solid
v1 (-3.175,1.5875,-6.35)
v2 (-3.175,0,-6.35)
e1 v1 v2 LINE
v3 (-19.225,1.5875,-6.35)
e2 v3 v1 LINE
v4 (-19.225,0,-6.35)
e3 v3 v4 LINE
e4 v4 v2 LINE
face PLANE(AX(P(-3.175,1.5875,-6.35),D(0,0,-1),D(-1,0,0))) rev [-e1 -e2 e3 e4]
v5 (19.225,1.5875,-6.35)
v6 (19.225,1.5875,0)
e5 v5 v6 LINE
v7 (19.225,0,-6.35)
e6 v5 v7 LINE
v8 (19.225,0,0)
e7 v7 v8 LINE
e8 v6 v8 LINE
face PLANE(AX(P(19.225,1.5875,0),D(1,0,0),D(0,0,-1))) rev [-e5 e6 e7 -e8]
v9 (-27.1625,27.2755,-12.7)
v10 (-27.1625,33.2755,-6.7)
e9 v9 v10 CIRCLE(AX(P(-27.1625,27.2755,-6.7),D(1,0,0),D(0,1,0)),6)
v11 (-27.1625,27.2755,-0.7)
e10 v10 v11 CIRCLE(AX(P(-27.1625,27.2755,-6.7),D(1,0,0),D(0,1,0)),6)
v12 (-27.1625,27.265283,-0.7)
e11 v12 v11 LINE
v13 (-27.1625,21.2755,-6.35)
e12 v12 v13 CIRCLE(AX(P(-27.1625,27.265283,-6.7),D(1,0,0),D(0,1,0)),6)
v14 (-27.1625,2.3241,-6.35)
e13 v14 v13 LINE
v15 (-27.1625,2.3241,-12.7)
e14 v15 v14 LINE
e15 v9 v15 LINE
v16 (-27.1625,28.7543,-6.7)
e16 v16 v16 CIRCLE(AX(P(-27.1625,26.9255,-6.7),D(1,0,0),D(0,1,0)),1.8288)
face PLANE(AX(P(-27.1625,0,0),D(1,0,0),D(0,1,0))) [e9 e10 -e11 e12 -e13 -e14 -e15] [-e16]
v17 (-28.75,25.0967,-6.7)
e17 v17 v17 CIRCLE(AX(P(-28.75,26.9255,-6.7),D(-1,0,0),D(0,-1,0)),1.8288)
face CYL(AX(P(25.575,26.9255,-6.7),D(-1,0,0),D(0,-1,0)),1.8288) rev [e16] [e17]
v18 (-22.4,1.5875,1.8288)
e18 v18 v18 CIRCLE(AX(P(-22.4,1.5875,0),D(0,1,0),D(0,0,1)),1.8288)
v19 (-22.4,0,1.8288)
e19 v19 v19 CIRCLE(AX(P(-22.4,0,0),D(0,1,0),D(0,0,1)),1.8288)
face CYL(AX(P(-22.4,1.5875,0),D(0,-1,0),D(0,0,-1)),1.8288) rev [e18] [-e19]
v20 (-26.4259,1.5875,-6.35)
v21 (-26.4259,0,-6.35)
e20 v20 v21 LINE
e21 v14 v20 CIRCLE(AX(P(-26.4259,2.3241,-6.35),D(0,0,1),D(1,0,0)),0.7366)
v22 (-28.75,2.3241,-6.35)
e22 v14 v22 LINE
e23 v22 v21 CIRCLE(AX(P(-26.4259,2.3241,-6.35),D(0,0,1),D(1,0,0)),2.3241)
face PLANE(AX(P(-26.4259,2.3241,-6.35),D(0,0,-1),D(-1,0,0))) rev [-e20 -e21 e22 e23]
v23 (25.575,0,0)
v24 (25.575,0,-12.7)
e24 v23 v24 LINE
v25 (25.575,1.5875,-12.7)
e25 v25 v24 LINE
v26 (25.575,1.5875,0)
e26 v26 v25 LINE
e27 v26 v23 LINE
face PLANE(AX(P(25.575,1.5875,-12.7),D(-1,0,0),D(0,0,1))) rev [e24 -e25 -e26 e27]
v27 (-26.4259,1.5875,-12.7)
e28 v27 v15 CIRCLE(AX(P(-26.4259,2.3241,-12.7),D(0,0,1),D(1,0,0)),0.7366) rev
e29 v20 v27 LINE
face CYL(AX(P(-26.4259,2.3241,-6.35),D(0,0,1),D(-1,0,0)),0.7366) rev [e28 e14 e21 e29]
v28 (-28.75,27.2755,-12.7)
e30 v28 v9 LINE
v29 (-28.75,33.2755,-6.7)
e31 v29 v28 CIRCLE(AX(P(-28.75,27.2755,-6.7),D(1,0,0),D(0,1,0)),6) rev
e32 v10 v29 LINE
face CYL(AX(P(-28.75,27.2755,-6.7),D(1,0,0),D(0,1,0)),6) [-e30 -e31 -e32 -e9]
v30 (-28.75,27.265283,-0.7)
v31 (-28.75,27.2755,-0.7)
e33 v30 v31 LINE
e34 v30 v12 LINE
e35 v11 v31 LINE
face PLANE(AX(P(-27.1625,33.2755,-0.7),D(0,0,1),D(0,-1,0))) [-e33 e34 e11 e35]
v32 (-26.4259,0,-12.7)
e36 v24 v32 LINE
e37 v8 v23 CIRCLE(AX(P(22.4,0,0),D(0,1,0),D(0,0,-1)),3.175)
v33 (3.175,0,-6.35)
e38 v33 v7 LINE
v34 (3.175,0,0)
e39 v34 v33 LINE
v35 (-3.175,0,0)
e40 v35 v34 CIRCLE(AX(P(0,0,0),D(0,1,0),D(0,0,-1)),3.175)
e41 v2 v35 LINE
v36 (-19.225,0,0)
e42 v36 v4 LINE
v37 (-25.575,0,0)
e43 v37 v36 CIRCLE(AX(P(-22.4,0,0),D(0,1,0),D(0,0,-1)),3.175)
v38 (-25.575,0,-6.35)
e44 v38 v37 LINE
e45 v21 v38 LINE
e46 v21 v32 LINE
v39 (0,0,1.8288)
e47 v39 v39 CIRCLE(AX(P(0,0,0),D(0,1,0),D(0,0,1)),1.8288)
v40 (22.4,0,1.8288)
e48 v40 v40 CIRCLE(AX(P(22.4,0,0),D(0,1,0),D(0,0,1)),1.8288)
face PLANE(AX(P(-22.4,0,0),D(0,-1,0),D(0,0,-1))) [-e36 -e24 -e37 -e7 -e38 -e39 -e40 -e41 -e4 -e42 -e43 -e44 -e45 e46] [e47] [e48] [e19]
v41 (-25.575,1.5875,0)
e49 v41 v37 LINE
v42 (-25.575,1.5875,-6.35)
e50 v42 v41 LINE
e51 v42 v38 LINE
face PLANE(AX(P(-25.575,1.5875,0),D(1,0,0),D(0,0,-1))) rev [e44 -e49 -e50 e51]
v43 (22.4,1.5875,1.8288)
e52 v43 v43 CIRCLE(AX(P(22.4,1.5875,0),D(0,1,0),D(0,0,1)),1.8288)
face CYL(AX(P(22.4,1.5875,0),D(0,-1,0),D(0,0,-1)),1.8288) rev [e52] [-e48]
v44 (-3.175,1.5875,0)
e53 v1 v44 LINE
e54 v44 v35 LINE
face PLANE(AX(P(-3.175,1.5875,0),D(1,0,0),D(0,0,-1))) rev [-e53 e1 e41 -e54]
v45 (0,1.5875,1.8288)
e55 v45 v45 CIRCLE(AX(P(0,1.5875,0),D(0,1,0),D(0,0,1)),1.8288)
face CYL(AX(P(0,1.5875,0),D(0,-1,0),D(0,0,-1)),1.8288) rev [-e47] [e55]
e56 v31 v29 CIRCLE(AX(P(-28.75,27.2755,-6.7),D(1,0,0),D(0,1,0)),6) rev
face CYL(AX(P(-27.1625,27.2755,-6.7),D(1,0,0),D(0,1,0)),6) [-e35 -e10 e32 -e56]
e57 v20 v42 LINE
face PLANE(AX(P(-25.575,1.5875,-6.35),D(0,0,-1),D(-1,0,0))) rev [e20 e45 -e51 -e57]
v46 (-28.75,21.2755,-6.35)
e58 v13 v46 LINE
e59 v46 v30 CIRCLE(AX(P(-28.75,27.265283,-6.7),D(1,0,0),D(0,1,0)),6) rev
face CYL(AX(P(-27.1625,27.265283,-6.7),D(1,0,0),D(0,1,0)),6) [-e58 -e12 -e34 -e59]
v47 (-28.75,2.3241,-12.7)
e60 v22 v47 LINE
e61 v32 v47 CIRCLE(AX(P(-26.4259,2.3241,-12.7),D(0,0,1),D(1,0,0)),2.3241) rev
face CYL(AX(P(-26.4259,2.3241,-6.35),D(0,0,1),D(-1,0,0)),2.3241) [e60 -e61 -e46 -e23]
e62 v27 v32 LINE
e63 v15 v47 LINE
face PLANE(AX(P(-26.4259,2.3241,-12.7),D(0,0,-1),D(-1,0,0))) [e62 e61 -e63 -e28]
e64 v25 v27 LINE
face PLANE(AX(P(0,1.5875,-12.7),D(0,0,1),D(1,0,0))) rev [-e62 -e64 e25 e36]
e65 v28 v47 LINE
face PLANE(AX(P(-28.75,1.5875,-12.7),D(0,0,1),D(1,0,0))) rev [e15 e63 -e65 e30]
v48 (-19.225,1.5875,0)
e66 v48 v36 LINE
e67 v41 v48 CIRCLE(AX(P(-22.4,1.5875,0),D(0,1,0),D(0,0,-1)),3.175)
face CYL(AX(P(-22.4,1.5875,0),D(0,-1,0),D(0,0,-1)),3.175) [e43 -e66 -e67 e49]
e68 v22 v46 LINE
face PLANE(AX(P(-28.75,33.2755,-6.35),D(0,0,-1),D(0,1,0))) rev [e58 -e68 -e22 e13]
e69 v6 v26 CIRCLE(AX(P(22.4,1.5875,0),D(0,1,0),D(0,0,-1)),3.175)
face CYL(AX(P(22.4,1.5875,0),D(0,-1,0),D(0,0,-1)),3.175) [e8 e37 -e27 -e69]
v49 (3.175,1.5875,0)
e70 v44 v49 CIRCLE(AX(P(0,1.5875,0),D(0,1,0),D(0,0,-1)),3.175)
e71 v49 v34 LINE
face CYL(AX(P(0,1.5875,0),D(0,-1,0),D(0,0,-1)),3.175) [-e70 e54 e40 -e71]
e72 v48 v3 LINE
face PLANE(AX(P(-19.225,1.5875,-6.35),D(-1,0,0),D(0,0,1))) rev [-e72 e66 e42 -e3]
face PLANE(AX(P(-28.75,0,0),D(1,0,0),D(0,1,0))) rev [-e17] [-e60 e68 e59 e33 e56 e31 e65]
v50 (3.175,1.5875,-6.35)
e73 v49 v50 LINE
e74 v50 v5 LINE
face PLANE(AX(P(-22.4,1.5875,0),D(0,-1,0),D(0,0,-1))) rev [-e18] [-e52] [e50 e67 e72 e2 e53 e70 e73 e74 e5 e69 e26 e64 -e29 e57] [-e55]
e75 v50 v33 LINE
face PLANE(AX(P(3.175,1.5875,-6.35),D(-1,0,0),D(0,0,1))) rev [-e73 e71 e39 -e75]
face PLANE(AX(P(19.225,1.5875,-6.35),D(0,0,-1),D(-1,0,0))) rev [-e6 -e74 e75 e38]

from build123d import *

# Parameters (mm, degrees)
SKETCH1_R                    = 1.8288
BASE_FLANGE1_DEPTH           = 1.5875
EDGE_FLANGE2_STRIP_W         = 7.8232
EDGE_FLANGE2_STRIP_H         = 1.5875
EDGE_FLANGE2_STRIP_CUT_DEPTH = 6.35
EDGE_FLANGE2_DEPTH           = 6.35
SKETCH19_W                   = 5.65
SKETCH19_H                   = 12
TAB1_DEPTH                   = 1.5875
HOLE1_START                  = -28.75
HOLE1_OUTLINE_R              = 1.8288
HOLE1_DEPTH                  = 1.5875
FILLET1_R                    = 6


# Read off the part's stored shape, not the designer's step: Hole1
# Sheet-metal steps are written as plain solids
with BuildPart() as part:
    # Sketch1 → Base-Flange1 (new body)
    with BuildSketch(Plane(origin=(0, 0, 0), x_dir=(1, 0, 0), z_dir=(0, 1, 0))):
        with BuildLine():
            Line((-25.575, 0), (-25.575, 6.35))
            Line((-25.575, 6.35), (-27.1625, 6.35))
            Line((-27.1625, 6.35), (-27.1625, 12.7))
            Line((-27.1625, 12.7), (0, 12.7))
            Line((0, 12.7), (25.575, 12.7))
            Line((25.575, 12.7), (25.575, 0))
            ThreePointArc((25.575, 0), (22.4, -3.175), (19.225, 0))
            Line((19.225, 0), (19.225, 6.35))
            Line((19.225, 6.35), (3.175, 6.35))
            Line((3.175, 6.35), (3.175, 0))
            ThreePointArc((3.175, 0), (0, -3.175), (-3.175, 0))
            Line((-3.175, 0), (-3.175, 6.35))
            Line((-3.175, 6.35), (-19.225, 6.35))
            Line((-19.225, 6.35), (-19.225, 0))
            ThreePointArc((-19.225, 0), (-22.4, -3.175), (-25.575, 0))
        make_face()
        with Locations(Location((0, 0, 0), (0, 0, 270))):
            Circle(SKETCH1_R, mode=Mode.SUBTRACT)
        with Locations(Location((22.4, 0, 0), (0, 0, 270))):
            Circle(SKETCH1_R, mode=Mode.SUBTRACT)
        with Locations(Location((-22.4, 0, 0), (0, 0, 270))):
            Circle(SKETCH1_R, mode=Mode.SUBTRACT)
    extrude(amount=BASE_FLANGE1_DEPTH)

    # Edge-Flange2 strip (across the edge) → Edge-Flange2 strip cut (cut)
    with BuildSketch(Plane(origin=(-27.1625, 1.5875, -12.7), x_dir=(1, 0, 0), z_dir=(0, 0, 1))):
        with Locations((-3.175, -0.79375)):
            Rectangle(EDGE_FLANGE2_STRIP_W, EDGE_FLANGE2_STRIP_H)
    extrude(amount=EDGE_FLANGE2_STRIP_CUT_DEPTH, mode=Mode.SUBTRACT)

    # Edge-Flange2 section (across the edge) → Edge-Flange2 (add)
    with BuildSketch(Plane(origin=(-27.1625, 1.5875, -12.7), x_dir=(1, 0, 0), z_dir=(0, 0, 1))):
        with BuildLine():
            Line((-1.5875, 0.7366), (-1.5875, 31.688))
            Line((-1.5875, 31.688), (0, 31.688))
            Line((0, 31.688), (0, 0.7366))
            ThreePointArc((0, 0.7366), (0.215745145, 0.215745145), (0.7366, 0))
            Line((0.7366, 0), (0.7366, -1.5875))
            ThreePointArc((0.7366, -1.5875), (-0.90678687, -0.90678687), (-1.5875, 0.7366))
        make_face()
    extrude(amount=EDGE_FLANGE2_DEPTH)

    # Sketch19 → Tab1 (add)
    with BuildSketch(Plane.ZY.offset(28.75)):
        with Locations((-3.525, 27.2755)):
            Rectangle(SKETCH19_W, SKETCH19_H)
    extrude(amount=-TAB1_DEPTH)

    # Hole1 outline → Hole1 (cut)
    with BuildSketch(Plane.YZ.offset(HOLE1_START)):
        with Locations((26.9255, -6.7)):
            Circle(HOLE1_OUTLINE_R)
    extrude(amount=HOLE1_DEPTH, mode=Mode.SUBTRACT)

    # Fillet1
    # the kernel refuses this fillet: 6 mm, written as the material it takes off along each edge
    with BuildSketch(Plane(origin=(-43.724457419, 21.2755, -0.7), x_dir=(0, 0, -1), z_dir=(1, 0, 0))) as fillet1_piece_1:
        with BuildLine():
            CenterArc((6, 5.989782968), FILLET1_R, 180, 86.655847796)
            Line((0, 5.989782968), (-0.12, 5.989782968))
            Line((-0.12, 5.989782968), (-0.12, 0))
            Line((-0.12, 0), (0, -0.12))
            ThreePointArc((0, -0.12), (2.825, -0.12), (5.643, -0.119795659))
            Line((5.643, -0.119795659), (5.65, 0))
        make_face()
    extrude(amount=31.536414838, mode=Mode.SUBTRACT)
    with BuildSketch(Plane(origin=(-43.75, 33.2755, -0.7), x_dir=(0, 0, -1), z_dir=(1, 0, 0)), Plane(origin=(-43.75, 33.2755, -12.7), x_dir=(0, -1, 0), z_dir=(1, 0, 0))) as fillet1_piece_2:
        with BuildLine():
            CenterArc((FILLET1_R, -FILLET1_R), FILLET1_R, 90, 90)
            Line((0, -FILLET1_R), (-FILLET1_R * 0.02, -FILLET1_R))
            Line((-FILLET1_R * 0.02, -FILLET1_R), (-FILLET1_R * 0.02, FILLET1_R * 0.02))
            Line((-FILLET1_R * 0.02, FILLET1_R * 0.02), (FILLET1_R, FILLET1_R * 0.02))
            Line((FILLET1_R, FILLET1_R * 0.02), (FILLET1_R, 0))
        make_face()
    extrude(amount=31.5875, mode=Mode.SUBTRACT)


solid = part.part
